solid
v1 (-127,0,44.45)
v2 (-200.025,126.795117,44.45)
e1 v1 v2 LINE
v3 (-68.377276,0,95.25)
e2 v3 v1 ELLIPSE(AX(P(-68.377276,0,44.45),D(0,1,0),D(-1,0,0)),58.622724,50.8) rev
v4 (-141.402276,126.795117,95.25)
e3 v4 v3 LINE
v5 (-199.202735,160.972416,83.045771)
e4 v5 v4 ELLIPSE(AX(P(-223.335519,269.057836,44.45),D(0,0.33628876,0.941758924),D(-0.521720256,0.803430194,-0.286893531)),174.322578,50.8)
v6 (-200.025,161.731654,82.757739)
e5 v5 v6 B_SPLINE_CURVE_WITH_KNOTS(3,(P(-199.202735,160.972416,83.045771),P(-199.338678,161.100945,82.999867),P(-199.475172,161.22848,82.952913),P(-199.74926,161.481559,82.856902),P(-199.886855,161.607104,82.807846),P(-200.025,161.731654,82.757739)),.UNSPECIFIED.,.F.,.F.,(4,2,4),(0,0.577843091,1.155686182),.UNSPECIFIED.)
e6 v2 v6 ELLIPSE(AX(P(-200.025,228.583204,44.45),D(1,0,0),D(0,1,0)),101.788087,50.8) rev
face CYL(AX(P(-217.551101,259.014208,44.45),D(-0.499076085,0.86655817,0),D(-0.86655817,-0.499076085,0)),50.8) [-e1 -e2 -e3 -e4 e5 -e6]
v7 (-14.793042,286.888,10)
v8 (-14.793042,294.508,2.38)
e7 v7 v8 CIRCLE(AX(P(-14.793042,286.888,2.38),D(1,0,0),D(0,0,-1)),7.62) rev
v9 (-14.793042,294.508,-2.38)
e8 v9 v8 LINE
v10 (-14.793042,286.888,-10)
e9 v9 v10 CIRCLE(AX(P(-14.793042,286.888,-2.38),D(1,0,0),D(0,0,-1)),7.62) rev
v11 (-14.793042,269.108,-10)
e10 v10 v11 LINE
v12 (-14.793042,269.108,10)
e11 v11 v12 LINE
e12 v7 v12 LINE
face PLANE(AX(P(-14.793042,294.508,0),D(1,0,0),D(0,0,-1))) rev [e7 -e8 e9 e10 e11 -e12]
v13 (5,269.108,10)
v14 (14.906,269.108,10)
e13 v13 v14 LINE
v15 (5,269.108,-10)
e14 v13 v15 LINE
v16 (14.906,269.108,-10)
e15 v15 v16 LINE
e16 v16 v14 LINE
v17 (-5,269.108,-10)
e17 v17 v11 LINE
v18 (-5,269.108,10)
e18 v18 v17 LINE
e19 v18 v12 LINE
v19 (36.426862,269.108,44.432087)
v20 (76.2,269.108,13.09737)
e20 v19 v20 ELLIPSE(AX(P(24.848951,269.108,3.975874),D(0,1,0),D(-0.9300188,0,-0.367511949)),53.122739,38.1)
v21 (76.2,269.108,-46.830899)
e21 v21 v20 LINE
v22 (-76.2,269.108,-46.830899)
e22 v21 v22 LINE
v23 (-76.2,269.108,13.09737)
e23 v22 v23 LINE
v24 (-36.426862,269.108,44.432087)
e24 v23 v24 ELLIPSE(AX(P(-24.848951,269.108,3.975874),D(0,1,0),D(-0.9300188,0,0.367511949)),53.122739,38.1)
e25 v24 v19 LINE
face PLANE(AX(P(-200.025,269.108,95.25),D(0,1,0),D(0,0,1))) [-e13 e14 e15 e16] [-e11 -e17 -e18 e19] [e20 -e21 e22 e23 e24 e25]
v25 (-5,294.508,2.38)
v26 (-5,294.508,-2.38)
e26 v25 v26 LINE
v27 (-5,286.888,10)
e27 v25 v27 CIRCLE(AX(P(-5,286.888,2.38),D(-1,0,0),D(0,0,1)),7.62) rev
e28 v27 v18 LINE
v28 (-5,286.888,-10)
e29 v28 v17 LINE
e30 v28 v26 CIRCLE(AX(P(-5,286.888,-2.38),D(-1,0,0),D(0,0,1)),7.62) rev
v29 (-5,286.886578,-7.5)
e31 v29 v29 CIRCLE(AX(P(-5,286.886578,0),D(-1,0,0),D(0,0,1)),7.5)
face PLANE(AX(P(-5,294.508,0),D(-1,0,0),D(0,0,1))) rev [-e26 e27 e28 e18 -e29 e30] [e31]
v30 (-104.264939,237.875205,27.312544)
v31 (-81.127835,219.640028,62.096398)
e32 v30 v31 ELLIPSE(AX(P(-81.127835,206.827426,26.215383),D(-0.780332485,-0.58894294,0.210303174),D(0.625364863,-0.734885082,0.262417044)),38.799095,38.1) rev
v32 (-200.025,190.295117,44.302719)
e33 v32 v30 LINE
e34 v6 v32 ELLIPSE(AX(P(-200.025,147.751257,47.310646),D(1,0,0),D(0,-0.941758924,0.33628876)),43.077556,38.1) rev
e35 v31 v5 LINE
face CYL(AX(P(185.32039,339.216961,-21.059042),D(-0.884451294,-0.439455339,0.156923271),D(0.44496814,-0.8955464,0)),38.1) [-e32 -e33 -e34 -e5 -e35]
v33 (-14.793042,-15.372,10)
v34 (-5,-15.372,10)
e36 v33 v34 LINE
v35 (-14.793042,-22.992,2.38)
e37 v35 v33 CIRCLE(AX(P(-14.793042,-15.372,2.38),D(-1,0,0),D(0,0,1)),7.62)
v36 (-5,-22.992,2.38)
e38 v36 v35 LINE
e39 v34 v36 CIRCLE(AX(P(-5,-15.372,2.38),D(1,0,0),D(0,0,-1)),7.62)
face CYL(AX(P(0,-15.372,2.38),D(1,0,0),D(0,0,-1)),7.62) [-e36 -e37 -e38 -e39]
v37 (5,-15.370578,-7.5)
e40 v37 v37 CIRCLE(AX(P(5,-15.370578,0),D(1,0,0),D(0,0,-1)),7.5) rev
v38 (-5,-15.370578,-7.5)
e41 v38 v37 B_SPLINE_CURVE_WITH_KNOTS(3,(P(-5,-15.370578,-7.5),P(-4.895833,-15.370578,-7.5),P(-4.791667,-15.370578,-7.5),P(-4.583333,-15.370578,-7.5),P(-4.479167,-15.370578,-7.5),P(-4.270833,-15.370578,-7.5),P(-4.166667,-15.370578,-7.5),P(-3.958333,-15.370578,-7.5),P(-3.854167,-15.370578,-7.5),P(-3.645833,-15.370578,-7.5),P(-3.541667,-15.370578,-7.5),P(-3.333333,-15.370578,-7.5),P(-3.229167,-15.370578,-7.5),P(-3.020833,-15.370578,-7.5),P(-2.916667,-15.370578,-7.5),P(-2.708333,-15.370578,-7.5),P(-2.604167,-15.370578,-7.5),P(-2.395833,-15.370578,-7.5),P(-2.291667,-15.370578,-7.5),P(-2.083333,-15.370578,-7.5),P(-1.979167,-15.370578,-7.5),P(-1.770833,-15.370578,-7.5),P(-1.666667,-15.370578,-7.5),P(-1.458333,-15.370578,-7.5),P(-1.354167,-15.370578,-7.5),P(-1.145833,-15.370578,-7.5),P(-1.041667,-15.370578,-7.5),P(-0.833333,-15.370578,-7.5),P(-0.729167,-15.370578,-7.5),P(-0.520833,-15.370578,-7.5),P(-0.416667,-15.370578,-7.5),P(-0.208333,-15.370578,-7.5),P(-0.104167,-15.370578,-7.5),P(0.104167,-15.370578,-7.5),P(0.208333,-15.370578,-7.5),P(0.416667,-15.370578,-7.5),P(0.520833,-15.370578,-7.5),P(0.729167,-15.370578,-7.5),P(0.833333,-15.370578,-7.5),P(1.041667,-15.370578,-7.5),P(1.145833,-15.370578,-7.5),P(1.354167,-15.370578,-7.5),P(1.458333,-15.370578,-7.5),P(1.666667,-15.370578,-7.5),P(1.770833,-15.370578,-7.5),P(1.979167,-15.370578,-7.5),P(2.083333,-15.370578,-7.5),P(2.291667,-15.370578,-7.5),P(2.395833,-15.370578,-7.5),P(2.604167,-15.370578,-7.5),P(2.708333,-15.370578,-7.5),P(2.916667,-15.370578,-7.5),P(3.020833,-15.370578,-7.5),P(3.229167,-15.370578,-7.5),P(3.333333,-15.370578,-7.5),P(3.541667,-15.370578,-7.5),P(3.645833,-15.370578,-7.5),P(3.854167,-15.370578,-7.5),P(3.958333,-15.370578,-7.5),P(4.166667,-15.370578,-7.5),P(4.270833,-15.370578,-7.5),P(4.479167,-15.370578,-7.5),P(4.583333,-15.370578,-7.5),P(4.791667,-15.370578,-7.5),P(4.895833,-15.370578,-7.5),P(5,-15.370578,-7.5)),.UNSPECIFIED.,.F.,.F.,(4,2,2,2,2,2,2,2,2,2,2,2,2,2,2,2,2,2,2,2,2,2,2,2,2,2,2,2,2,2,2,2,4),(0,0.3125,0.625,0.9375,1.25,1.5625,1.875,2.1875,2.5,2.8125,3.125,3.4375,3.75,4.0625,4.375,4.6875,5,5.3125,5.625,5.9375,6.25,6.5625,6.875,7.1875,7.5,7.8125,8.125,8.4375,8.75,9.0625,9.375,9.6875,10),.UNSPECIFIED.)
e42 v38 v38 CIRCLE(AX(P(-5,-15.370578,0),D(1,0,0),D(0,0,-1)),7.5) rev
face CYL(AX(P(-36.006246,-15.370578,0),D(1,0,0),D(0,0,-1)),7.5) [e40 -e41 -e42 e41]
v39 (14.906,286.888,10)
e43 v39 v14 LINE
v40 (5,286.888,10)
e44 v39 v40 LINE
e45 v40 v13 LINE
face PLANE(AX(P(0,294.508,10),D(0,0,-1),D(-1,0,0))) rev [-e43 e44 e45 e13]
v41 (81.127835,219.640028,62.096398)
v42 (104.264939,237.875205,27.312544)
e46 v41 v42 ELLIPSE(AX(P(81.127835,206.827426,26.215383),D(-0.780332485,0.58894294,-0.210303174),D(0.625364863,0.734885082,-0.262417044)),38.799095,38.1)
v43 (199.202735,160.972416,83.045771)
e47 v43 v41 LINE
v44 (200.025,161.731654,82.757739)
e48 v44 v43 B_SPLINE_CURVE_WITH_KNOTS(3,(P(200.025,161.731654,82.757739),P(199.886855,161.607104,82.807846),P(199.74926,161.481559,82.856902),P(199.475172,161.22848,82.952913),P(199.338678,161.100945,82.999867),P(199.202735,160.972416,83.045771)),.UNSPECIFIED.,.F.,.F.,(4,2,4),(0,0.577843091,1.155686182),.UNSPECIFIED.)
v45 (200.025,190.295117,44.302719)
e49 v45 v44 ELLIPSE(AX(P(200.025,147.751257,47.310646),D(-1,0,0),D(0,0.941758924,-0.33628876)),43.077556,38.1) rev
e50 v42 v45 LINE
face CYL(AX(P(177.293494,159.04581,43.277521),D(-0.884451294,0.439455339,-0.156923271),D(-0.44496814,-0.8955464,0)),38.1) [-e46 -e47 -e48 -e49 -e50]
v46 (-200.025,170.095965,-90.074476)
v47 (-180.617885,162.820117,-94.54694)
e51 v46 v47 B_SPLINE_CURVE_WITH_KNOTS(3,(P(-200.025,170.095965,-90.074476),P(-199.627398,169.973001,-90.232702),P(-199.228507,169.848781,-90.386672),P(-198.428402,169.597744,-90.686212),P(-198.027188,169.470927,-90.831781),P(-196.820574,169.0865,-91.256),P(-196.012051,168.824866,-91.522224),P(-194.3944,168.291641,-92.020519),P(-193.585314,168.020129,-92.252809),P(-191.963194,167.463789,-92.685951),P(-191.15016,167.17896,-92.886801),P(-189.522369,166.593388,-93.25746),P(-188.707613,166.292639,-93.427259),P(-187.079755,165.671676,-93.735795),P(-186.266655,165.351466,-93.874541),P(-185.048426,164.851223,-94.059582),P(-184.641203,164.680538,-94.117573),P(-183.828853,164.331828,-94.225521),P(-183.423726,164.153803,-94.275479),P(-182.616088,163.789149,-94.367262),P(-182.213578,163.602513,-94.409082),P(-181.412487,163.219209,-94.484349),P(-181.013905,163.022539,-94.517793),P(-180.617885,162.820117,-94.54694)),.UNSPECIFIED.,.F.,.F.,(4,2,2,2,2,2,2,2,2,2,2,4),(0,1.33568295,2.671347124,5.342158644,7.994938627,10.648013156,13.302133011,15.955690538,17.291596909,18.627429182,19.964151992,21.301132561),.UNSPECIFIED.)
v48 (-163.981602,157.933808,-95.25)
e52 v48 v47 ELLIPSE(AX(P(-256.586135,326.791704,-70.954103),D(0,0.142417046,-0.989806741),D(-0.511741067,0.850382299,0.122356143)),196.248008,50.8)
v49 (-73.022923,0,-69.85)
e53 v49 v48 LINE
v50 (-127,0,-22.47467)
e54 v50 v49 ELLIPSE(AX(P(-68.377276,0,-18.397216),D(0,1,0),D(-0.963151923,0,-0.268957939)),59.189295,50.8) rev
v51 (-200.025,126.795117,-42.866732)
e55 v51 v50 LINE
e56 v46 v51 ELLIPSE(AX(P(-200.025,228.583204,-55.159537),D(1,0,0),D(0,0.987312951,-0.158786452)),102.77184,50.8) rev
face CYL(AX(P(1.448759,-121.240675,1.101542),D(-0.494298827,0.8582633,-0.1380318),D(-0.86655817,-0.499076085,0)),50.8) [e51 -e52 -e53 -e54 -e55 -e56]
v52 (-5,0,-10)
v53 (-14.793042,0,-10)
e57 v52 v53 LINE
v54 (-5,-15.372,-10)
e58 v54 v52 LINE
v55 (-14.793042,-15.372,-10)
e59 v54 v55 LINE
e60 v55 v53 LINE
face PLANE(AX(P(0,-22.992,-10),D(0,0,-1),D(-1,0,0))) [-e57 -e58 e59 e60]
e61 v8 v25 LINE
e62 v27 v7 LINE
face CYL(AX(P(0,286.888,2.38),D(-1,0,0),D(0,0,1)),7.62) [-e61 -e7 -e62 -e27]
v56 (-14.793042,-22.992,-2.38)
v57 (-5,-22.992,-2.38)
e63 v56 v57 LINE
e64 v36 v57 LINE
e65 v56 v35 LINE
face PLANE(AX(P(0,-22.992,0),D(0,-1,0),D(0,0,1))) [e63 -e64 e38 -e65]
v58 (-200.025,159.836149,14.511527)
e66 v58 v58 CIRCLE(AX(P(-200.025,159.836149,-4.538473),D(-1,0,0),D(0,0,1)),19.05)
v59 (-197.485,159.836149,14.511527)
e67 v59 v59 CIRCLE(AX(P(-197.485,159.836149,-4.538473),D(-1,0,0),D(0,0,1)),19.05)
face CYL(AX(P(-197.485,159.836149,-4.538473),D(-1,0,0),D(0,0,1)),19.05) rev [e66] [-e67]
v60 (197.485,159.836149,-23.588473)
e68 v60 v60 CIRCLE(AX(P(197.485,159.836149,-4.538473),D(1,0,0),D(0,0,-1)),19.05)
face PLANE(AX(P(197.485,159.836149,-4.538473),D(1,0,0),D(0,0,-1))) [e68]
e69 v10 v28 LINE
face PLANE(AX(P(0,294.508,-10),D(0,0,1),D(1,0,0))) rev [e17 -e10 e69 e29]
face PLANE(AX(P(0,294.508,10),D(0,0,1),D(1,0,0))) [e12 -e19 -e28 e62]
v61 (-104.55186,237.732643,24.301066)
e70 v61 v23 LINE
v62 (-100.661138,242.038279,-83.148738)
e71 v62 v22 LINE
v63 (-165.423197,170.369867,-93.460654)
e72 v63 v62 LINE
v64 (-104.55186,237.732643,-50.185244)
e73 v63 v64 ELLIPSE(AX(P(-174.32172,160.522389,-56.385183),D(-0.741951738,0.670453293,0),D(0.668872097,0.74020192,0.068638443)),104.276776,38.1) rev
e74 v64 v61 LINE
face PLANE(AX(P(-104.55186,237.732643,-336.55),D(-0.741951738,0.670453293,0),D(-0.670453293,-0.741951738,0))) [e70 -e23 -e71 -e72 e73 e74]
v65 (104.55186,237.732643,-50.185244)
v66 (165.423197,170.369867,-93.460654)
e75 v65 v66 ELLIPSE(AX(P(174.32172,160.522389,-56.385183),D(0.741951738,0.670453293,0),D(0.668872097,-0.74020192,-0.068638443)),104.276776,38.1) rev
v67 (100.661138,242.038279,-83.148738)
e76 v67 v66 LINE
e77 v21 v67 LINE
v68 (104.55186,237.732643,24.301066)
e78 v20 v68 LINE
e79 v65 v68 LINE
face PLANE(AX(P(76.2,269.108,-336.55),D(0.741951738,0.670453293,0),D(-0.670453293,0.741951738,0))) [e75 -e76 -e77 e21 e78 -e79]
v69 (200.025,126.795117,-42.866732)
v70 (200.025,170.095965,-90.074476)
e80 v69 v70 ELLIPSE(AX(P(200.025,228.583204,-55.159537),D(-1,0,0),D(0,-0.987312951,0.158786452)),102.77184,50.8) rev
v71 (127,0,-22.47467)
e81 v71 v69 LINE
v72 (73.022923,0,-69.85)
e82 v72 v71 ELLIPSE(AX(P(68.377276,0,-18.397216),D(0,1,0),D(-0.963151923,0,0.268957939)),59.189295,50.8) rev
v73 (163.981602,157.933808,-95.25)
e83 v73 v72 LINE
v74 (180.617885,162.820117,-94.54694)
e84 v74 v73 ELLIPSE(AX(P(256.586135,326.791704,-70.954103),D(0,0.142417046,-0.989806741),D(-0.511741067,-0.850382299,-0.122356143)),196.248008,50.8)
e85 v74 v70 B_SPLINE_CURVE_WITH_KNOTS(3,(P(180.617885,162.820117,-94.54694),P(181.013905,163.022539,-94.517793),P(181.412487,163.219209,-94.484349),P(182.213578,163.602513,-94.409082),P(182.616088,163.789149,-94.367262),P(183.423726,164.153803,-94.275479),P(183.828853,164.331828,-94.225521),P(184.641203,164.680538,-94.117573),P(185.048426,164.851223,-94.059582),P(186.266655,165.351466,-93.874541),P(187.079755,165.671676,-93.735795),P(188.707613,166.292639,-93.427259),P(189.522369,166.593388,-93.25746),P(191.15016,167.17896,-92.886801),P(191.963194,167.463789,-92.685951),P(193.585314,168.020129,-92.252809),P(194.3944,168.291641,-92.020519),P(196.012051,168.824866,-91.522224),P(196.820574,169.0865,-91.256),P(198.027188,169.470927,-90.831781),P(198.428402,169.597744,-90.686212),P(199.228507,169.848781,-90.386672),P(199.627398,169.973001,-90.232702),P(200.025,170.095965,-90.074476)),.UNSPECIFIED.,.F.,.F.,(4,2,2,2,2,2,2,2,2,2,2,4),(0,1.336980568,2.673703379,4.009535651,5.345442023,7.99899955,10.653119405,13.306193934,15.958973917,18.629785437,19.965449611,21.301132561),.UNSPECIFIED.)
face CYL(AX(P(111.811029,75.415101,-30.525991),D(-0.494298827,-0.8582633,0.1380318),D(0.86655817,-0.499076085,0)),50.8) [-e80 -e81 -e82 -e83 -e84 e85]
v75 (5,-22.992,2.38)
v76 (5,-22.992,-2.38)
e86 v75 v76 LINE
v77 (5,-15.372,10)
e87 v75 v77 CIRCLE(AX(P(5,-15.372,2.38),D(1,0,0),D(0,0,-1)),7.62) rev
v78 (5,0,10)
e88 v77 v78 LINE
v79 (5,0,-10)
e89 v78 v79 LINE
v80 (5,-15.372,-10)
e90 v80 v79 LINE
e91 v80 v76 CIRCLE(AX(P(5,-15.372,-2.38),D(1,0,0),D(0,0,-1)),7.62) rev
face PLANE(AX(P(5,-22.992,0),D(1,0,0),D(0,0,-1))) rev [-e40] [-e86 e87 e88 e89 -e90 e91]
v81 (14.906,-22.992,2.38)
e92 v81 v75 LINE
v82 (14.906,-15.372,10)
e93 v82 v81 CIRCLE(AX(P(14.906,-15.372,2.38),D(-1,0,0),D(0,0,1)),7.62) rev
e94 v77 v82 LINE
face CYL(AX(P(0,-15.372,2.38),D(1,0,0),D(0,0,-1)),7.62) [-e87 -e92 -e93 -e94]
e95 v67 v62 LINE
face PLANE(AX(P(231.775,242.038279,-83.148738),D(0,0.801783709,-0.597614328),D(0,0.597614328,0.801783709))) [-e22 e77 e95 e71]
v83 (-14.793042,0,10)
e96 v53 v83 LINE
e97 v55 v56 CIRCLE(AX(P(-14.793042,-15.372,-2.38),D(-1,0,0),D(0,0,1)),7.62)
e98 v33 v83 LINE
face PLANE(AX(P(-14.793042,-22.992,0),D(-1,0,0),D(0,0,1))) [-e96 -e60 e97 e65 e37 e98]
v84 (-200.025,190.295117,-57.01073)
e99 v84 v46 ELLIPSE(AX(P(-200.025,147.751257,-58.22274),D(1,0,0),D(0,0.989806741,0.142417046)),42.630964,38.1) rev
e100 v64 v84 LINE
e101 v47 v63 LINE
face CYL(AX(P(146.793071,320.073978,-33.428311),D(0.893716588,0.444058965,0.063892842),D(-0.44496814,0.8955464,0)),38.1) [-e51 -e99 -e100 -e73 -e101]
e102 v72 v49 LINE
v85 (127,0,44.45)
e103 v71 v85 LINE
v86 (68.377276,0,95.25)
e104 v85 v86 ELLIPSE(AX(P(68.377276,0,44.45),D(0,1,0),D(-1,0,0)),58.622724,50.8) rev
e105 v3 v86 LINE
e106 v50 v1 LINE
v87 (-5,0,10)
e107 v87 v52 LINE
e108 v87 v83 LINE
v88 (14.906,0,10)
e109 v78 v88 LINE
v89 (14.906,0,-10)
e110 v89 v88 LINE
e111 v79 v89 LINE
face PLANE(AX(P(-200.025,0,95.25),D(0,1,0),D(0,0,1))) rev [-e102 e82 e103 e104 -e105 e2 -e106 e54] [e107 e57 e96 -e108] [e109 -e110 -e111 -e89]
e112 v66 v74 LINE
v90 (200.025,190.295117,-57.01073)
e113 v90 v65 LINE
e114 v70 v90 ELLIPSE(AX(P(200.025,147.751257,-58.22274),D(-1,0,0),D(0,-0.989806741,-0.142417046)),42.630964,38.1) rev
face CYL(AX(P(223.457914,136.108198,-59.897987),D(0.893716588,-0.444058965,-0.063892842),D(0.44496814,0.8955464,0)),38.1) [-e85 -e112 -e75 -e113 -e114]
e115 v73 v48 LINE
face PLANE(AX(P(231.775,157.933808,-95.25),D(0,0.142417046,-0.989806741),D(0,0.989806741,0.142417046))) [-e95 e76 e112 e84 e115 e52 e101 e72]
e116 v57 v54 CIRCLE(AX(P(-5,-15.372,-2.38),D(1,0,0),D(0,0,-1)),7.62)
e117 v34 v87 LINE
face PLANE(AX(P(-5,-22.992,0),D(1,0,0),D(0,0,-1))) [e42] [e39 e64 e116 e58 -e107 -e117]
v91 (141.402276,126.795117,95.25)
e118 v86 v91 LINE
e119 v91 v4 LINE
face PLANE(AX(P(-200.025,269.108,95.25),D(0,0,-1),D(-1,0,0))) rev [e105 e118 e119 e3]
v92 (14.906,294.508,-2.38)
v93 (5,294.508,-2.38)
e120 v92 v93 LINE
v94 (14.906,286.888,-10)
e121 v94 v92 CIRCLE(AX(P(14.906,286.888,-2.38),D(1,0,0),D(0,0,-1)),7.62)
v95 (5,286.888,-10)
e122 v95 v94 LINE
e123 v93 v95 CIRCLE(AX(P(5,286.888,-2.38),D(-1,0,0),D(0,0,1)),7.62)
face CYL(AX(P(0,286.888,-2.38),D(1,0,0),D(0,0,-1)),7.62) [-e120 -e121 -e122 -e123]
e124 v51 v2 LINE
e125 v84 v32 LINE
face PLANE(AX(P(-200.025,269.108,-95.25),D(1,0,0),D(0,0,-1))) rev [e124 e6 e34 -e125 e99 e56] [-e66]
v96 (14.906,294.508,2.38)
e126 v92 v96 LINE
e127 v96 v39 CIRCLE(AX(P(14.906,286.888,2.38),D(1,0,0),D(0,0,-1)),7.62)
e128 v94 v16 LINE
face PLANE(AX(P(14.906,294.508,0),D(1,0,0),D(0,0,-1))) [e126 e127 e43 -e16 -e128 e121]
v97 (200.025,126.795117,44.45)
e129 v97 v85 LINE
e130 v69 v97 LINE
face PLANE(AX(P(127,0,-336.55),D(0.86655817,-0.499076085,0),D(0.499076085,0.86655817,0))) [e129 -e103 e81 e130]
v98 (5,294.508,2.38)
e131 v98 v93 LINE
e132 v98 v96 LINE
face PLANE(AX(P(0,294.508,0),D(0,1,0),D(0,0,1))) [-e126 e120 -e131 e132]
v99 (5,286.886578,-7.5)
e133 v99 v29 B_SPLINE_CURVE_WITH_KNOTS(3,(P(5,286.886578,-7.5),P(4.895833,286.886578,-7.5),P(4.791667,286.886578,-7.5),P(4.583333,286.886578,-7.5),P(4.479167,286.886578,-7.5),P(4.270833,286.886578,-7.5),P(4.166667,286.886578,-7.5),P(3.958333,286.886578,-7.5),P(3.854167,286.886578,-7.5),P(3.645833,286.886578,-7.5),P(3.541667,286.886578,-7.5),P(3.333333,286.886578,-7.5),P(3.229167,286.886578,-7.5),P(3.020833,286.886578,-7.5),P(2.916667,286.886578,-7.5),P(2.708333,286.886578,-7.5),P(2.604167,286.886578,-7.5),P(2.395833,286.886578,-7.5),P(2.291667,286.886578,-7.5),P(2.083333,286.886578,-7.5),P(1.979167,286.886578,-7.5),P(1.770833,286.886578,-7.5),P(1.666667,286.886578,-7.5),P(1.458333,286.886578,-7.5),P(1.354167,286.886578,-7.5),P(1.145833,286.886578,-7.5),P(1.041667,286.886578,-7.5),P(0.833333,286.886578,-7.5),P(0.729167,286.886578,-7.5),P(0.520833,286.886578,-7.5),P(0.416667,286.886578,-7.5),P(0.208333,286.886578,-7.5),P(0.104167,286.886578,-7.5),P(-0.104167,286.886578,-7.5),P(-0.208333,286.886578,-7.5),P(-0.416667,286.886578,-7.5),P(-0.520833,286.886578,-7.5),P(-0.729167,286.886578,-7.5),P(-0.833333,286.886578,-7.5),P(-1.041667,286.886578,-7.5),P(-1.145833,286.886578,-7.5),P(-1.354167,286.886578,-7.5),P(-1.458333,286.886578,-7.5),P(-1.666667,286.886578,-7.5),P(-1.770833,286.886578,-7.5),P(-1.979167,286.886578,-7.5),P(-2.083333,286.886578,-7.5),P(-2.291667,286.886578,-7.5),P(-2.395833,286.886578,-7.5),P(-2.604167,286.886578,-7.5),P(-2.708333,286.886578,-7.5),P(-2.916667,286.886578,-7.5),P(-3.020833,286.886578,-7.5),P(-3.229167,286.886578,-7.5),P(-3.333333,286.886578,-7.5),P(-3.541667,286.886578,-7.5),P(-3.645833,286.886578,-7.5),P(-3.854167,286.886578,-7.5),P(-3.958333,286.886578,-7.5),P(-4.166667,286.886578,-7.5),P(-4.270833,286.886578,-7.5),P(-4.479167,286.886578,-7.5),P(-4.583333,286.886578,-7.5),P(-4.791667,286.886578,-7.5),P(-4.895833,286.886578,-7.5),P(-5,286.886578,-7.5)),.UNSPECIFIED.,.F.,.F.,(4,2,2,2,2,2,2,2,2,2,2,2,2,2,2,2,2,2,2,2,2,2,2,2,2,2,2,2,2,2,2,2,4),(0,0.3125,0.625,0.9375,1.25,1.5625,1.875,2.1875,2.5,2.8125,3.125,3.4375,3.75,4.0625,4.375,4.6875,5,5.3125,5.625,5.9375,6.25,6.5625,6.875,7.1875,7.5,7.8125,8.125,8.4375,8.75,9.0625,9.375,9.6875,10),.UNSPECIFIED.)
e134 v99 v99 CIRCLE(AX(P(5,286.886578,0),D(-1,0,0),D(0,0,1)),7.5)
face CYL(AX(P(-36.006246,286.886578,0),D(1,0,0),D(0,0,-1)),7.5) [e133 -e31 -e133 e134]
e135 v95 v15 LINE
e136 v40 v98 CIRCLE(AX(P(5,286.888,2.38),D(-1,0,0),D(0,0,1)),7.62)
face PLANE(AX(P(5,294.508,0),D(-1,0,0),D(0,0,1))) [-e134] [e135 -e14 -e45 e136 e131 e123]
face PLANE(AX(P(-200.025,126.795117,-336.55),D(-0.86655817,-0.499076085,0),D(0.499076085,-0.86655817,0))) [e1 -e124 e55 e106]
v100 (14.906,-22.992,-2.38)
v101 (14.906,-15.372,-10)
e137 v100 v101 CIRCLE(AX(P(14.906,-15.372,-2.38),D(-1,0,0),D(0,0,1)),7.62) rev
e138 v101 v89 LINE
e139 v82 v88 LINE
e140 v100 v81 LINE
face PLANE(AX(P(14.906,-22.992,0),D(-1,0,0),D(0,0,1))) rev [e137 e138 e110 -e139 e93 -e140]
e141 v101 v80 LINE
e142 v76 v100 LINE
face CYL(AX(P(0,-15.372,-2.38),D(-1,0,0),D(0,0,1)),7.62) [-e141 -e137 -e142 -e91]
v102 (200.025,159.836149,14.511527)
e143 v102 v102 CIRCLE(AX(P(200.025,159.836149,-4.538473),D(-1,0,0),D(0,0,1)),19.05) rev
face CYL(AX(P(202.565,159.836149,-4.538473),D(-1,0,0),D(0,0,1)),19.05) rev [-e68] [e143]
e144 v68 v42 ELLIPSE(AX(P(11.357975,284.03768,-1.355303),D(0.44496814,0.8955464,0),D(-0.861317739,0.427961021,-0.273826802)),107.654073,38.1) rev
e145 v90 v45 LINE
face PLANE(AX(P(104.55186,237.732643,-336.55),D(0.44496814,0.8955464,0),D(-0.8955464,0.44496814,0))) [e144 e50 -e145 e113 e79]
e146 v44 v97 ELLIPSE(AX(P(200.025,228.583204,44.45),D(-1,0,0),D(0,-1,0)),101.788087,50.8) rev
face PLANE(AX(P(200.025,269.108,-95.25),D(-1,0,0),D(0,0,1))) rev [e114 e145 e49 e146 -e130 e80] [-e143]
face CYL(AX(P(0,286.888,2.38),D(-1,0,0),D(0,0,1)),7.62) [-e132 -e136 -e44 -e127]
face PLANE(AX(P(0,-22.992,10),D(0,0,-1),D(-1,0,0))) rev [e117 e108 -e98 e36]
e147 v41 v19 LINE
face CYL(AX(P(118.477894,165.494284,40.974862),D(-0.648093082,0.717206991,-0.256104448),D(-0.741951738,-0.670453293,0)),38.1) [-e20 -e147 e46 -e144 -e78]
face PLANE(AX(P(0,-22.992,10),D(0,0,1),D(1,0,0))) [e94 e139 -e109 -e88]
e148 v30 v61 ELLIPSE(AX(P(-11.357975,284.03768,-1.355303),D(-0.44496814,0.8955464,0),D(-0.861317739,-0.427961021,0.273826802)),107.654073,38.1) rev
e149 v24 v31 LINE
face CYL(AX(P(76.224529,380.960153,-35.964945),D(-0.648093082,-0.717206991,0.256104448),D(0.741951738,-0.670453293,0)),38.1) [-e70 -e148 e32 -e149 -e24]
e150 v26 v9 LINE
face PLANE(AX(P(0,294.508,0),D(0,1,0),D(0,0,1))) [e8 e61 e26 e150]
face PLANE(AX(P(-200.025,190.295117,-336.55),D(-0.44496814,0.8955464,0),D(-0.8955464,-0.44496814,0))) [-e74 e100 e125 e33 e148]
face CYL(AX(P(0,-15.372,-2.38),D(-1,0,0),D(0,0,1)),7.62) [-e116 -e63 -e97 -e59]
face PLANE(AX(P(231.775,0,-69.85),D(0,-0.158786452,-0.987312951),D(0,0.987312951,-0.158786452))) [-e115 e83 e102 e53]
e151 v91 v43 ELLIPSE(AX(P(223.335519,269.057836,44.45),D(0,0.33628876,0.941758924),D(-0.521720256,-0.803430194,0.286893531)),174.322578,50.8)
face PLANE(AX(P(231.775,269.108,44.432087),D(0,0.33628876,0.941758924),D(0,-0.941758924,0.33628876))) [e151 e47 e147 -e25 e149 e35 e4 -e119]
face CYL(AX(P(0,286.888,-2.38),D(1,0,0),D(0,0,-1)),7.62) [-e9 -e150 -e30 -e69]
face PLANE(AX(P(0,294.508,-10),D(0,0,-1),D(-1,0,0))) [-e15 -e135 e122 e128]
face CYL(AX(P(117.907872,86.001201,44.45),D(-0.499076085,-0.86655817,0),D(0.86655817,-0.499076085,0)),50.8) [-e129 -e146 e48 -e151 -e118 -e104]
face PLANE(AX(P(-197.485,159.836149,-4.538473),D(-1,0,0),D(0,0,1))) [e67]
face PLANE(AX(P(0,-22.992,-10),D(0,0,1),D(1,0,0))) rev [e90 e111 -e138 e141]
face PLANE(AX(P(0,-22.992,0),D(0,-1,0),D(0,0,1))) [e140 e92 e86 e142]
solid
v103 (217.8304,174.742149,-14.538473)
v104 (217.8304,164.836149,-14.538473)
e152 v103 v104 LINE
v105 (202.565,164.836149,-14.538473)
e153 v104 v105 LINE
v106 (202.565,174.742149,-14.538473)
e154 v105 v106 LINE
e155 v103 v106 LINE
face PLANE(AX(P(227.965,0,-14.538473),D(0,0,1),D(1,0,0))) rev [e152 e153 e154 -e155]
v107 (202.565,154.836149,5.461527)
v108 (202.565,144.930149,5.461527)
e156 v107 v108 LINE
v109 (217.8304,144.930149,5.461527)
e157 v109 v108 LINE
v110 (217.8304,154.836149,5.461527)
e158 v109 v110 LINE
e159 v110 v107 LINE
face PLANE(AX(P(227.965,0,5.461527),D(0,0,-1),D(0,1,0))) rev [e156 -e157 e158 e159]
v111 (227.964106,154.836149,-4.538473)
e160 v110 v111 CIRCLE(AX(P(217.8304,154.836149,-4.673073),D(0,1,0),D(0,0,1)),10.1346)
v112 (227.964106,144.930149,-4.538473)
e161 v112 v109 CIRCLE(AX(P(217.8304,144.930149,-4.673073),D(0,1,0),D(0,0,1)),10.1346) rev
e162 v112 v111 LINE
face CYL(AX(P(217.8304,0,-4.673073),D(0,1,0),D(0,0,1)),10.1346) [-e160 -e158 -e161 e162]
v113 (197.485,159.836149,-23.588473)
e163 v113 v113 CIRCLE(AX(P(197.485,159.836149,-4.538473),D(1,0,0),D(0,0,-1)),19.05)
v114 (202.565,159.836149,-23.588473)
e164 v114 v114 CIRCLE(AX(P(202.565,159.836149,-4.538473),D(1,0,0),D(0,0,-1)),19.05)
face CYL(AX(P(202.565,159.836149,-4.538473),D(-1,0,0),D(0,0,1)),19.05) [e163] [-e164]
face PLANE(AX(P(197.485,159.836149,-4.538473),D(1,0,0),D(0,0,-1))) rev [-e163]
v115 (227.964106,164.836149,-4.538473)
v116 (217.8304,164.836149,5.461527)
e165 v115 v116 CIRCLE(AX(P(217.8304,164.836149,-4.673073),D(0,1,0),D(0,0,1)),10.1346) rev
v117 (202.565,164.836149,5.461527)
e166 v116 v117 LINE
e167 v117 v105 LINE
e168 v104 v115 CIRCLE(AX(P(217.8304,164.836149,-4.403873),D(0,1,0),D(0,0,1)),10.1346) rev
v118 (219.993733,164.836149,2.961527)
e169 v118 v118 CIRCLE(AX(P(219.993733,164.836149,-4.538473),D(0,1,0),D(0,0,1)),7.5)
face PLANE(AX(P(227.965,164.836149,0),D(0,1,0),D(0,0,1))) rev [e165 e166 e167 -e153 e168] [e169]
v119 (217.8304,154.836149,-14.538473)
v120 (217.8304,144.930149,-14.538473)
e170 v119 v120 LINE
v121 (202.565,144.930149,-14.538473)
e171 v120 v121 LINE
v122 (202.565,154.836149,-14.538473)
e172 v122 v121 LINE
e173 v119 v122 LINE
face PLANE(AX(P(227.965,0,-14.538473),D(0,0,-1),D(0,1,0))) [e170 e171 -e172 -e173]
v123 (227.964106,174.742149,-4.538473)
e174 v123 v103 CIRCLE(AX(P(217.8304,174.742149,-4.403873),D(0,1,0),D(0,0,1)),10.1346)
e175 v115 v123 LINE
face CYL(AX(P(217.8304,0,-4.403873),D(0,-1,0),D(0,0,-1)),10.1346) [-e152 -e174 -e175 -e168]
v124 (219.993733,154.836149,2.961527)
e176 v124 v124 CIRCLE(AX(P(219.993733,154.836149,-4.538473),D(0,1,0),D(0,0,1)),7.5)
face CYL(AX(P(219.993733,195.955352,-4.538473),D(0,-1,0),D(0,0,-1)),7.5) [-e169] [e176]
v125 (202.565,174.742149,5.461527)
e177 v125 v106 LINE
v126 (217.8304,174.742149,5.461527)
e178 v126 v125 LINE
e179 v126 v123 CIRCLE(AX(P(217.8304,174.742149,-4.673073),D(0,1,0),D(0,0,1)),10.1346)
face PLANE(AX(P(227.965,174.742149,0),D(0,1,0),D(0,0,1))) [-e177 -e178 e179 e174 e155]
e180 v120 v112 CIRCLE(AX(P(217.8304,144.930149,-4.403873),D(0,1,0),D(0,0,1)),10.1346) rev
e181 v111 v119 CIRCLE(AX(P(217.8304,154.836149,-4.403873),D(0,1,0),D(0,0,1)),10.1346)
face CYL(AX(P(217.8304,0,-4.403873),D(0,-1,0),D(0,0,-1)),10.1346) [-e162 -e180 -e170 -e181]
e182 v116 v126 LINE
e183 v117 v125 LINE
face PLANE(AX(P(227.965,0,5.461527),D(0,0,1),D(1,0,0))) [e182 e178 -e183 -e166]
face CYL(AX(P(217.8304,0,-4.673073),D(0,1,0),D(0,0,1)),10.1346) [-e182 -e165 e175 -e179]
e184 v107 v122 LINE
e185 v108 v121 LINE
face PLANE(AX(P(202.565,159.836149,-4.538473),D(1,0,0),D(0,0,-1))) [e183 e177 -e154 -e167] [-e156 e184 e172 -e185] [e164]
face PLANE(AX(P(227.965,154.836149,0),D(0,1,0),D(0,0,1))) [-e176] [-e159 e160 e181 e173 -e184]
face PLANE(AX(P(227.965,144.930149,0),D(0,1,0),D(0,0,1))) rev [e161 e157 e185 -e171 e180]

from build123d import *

# Parameters (mm, degrees)
SKETCH1_W                   = 400.05
SKETCH1_H                   = 190.5
EXTRUDE1_DEPTH              = 269.108
SKETCH7_OUTSIDE_W           = 296.182
SKETCH7_OUTSIDE_H           = 374.79
CUT_EXTRUDE1_DEPTH          = 431.8
SKETCH8_OUTSIDE_W           = 505.732
SKETCH8_OUTSIDE_H           = 374.79
CUT_EXTRUDE2_DEPTH          = 431.8
FILLET1_R                   = 50.8
FILLET10_R                  = 38.1
SKETCH9_W                   = 9.7930423
SKETCH9_H                   = 20
SKETCH9_W_2                 = 9.906
BOSS_EXTRUDE1_DEPTH         = 25.4
SKETCH11_R                  = 7.5
BOSS_EXTRUDE3_DEPTH         = 29.6990423
FILLET11_R                  = 7.62
FILLET11_OF_MIRROR1_R       = 7.62
SKETCH12_R                  = 19.05
BOSS_EXTRUDE6_DEPTH         = 2.54
SKETCH14_W                  = 20
SKETCH14_H                  = 9.906
BOSS_EXTRUDE7_DEPTH         = 25.4
BOSS_EXTRUDE8_DEPTH         = 29.812
FILLET15_R                  = 10.1346
BODY_MOVE_COPY1_START       = 144.930148569
BODY_MOVE_COPY1_OUTLINE_R   = 7.5
BODY_MOVE_COPY1_DEPTH       = 29.812
BODY_MOVE_COPY1_2_OUTLINE_R = 7.5
BODY_MOVE_COPY1_2_DEPTH     = 9.906
BODY_MOVE_COPY1_START_2     = 164.836148569
BODY_MOVE_COPY1_3_OUTLINE_R = 7.5
BODY_MOVE_COPY1_3_DEPTH     = 9.906
BODY_MOVE_COPY1_START_3     = 197.485
BODY_MOVE_COPY1_4_OUTLINE_R = 19.05
BODY_MOVE_COPY1_4_DEPTH     = 5.08
CUT_EXTRUDE3_START          = -2.54
SKETCH16_R                  = 19.05
CUT_EXTRUDE3_DEPTH          = 2.54


with BuildPart() as part:
    # Sketch1 → Extrude1 (new body)
    with BuildSketch(Plane(origin=(0, 0, 0), x_dir=(1, 0, 0), z_dir=(0, 1, 0))):
        Rectangle(SKETCH1_W, SKETCH1_H)
    extrude(amount=EXTRUDE1_DEPTH)

    # Sketch7 outside → Cut-Extrude1 (cut)
    with BuildSketch(Plane.ZY.offset(200.025)):
        with Locations((0, 134.554)):
            Rectangle(SKETCH7_OUTSIDE_W, SKETCH7_OUTSIDE_H)
        Polygon((44.432087016, 269.108), (95.25, 126.795116664), (95.25, 0), (-69.85, 0), (-95.25, 157.93380788), (-83.14873838, 242.038278884), (-46.830898628, 269.108), align=None, mode=Mode.SUBTRACT)
    extrude(amount=-CUT_EXTRUDE1_DEPTH, mode=Mode.SUBTRACT)

    # Sketch8 outside → Cut-Extrude2 (cut)
    with BuildSketch(Plane.XY.offset(95.25)):
        with Locations((0, 134.554)):
            Rectangle(SKETCH8_OUTSIDE_W, SKETCH8_OUTSIDE_H)
        Polygon((127, 0), (200.025, 126.795116664), (200.025, 190.295116664), (104.551859803, 237.732642625), (76.2, 269.108), (-76.2, 269.108), (-104.551859803, 237.732642625), (-200.025, 190.295116664), (-200.025, 126.795116664), (-127, 0), align=None, mode=Mode.SUBTRACT)
    extrude(amount=-CUT_EXTRUDE2_DEPTH, mode=Mode.SUBTRACT)

    # Fillet1
    fillet1_edges = [part.edges().sort_by_distance(p)[0] for p in [
        (-163.5125, 63.397558332, 95.25),
        (-163.5125, 63.397558332, -80.046030877),
        (163.5125, 63.397558332, -80.046030877),
        (163.5125, 63.397558332, 95.25),
    ]]
    fillet(fillet1_edges, radius=FILLET1_R)

    # Fillet10
    fillet10_edges = [part.edges().sort_by_distance(p)[0] for p in [
        (152.288429902, 214.013879644, -87.180992348),
        (152.288429902, 214.013879644, 64.105416293),
        (-152.288429902, 214.013879644, -87.180992348),
        (-152.288429902, 214.013879644, 64.105416293),
        (90.375929902, 253.420321312, 50.033934662),
        (-90.375929902, 253.420321312, 50.033934662),
    ]]
    fillet(fillet10_edges, radius=FILLET10_R)

    # Sketch9 → Boss-Extrude1 (add)
    with BuildSketch(Plane(origin=(0, 269.108, 0), x_dir=(1, 0, 0), z_dir=(0, 1, 0))):
        with Locations((-9.89652115, 0)):
            Rectangle(SKETCH9_W, SKETCH9_H)
        with Locations((9.953, 0)):
            Rectangle(SKETCH9_W_2, SKETCH9_H)
    boss_extrude1 = extrude(amount=BOSS_EXTRUDE1_DEPTH)

    # Sketch11 → Boss-Extrude3 (add)
    with BuildSketch(Plane(origin=(14.906, 0, 0), x_dir=(0, 0, -1), z_dir=(1, 0, 0))):
        with Locations((0, 286.886577907)):
            Circle(SKETCH11_R)
    boss_extrude3 = extrude(amount=-BOSS_EXTRUDE3_DEPTH)

    # Fillet11
    fillet11_edges = [part.edges().sort_by_distance(p)[0] for p in [
        (-9.89652115, 294.508, 10),
        (-9.89652115, 294.508, -10),
        (9.953, 294.508, -10),
        (9.953, 294.508, 10),
    ]]
    fillet(fillet11_edges, radius=FILLET11_R)

    # Mirror1: Boss-Extrude1, Boss-Extrude3 across plane
    add(boss_extrude1.mirror(Plane.ZX.offset(135.758)))
    add(boss_extrude3.mirror(Plane.ZX.offset(135.758)))

    # Fillet11 of Mirror1
    fillet11_of_mirror1_edges = [part.edges().sort_by_distance(p)[0] for p in [
        (-9.89652115, -22.992, 10),
        (-9.89652115, -22.992, -10),
        (9.953, -22.992, -10),
        (9.953, -22.992, 10),
    ]]
    fillet(fillet11_of_mirror1_edges, radius=FILLET11_OF_MIRROR1_R)


with BuildPart() as body_2:
    # Sketch12 → Boss-Extrude6 (new, symmetric)
    with BuildSketch(Plane(origin=(200.025, 0, 0), x_dir=(0, 0, -1), z_dir=(1, 0, 0))):
        with Locations((4.538473093, 159.836148569)):
            Circle(SKETCH12_R)
    extrude(amount=BOSS_EXTRUDE6_DEPTH, both=True)

    # Sketch14 → Boss-Extrude7 (add)
    with BuildSketch(Plane(origin=(202.565, 0, 0), x_dir=(0, 0, -1), z_dir=(1, 0, 0))):
        with Locations((4.538473093, 169.789148569)):
            Rectangle(SKETCH14_W, SKETCH14_H)
        with Locations((4.538473093, 149.883148569)):
            Rectangle(SKETCH14_W, SKETCH14_H)
    extrude(amount=BOSS_EXTRUDE7_DEPTH)

    # Sketch15 → Boss-Extrude8 (add)
    with BuildSketch(Plane.XZ.offset(-144.930148569)):
        with BuildLine():
            ThreePointArc((212.493733331, -4.538473093), (219.993733331, -12.038473093), (227.493733331, -4.538473093))
            Line((227.493733331, -4.538473093), (212.493733331, -4.538473093))
        make_face()
        with BuildLine():
            Line((212.493733331, -4.538473093), (227.493733331, -4.538473093))
            ThreePointArc((227.493733331, -4.538473093), (219.993733331, 2.961526907), (212.493733331, -4.538473093))
        make_face()
    extrude(amount=-BOSS_EXTRUDE8_DEPTH)

    # Fillet15
    # the kernel refuses this fillet: 10.1346 mm, written as the material it takes off along each edge
    with BuildSketch(Plane(origin=(227.965, 200.078648569, 5.461526907), x_dir=(-1, 0, 0), z_dir=(0, -1, 0)), Plane(origin=(227.965, 139.499648569, -14.538473093), x_dir=(-1, 0, 0), z_dir=(0, 1, 0))) as fillet15_piece_1:
        with BuildLine():
            CenterArc((FILLET15_R, FILLET15_R), FILLET15_R, 180, 90)
            Line((0, FILLET15_R), (0, 0))
            Line((0, 0), (FILLET15_R, 0))
        make_face()
    extrude(amount=60.579, mode=Mode.SUBTRACT)
    with BuildSketch(Plane(origin=(227.965, 119.593648569, 5.461526907), x_dir=(-1, 0, 0), z_dir=(0, 1, 0)), Plane(origin=(227.965, 180.172648569, -14.538473093), x_dir=(-1, 0, 0), z_dir=(0, -1, 0))) as fillet15_piece_2:
        with BuildLine():
            CenterArc((FILLET15_R, -FILLET15_R), FILLET15_R, 90, 90)
            Line((0, -FILLET15_R), (0, 0))
            Line((0, 0), (FILLET15_R, 0))
        make_face()
    extrude(amount=60.579, mode=Mode.SUBTRACT)


with BuildPart() as body_3:
    # Body-Move/Copy1: read off the stored shape, not the designer's step
    # Body-Move/Copy1 outline → Body-Move/Copy1 (new body)
    with BuildSketch(Plane(origin=(0, 0, 0), x_dir=(1, 0, 0), z_dir=(0, 1, 0)).offset(BODY_MOVE_COPY1_START)):
        with Locations((219.993733331, 4.538473093)):
            Circle(BODY_MOVE_COPY1_OUTLINE_R)
    extrude(amount=BODY_MOVE_COPY1_DEPTH)

    # Body-Move_Copy1 2 outline → Body-Move_Copy1 2 (add)
    with BuildSketch(Plane(origin=(0, 0, 0), x_dir=(1, 0, 0), z_dir=(0, 1, 0)).offset(BODY_MOVE_COPY1_START)):
        with BuildLine():
            Line((202.565, 14.538473093), (202.565, -5.461526907))
            Line((202.565, -5.461526907), (217.8304, -5.461526907))
            ThreePointArc((217.8304, -5.461526907), (224.948897032, -2.54060261), (227.964106133, 4.538473093))
            ThreePointArc((227.964106133, 4.538473093), (224.948897032, 11.617548797), (217.8304, 14.538473093))
            Line((217.8304, 14.538473093), (202.565, 14.538473093))
        make_face()
        with Locations((219.993733331, 4.538473093)):
            Circle(BODY_MOVE_COPY1_2_OUTLINE_R, mode=Mode.SUBTRACT)
    extrude(amount=BODY_MOVE_COPY1_2_DEPTH)

    # Body-Move_Copy1 3 outline → Body-Move_Copy1 3 (add)
    with BuildSketch(Plane(origin=(0, 0, 0), x_dir=(1, 0, 0), z_dir=(0, 1, 0)).offset(BODY_MOVE_COPY1_START_2)):
        with BuildLine():
            Line((202.565, 14.538473093), (202.565, -5.461526907))
            Line((202.565, -5.461526907), (217.8304, -5.461526907))
            ThreePointArc((217.8304, -5.461526907), (224.948897032, -2.54060261), (227.964106133, 4.538473093))
            ThreePointArc((227.964106133, 4.538473093), (224.948897032, 11.617548797), (217.8304, 14.538473093))
            Line((217.8304, 14.538473093), (202.565, 14.538473093))
        make_face()
        with Locations((219.993733331, 4.538473093)):
            Circle(BODY_MOVE_COPY1_3_OUTLINE_R, mode=Mode.SUBTRACT)
    extrude(amount=BODY_MOVE_COPY1_3_DEPTH)

    # Body-Move_Copy1 4 outline → Body-Move_Copy1 4 (add)
    with BuildSketch(Plane.YZ.offset(BODY_MOVE_COPY1_START_3)):
        with Locations((159.836148569, -4.538473093)):
            Circle(BODY_MOVE_COPY1_4_OUTLINE_R)
    extrude(amount=BODY_MOVE_COPY1_4_DEPTH)


with BuildPart() as part_1:
    add(part.part)

    # Combine1: cut body 2
    add(body_2.part, mode=Mode.SUBTRACT)

    # Sketch16 → Cut-Extrude3 (cut)
    with BuildSketch(Plane.ZY.offset(200.025).offset(CUT_EXTRUDE3_START)):
        with Locations((-4.538473093, 159.836148569)):
            Circle(SKETCH16_R)
    extrude(amount=CUT_EXTRUDE3_DEPTH, mode=Mode.SUBTRACT)


solid = Compound([body_3.part, part_1.part])
